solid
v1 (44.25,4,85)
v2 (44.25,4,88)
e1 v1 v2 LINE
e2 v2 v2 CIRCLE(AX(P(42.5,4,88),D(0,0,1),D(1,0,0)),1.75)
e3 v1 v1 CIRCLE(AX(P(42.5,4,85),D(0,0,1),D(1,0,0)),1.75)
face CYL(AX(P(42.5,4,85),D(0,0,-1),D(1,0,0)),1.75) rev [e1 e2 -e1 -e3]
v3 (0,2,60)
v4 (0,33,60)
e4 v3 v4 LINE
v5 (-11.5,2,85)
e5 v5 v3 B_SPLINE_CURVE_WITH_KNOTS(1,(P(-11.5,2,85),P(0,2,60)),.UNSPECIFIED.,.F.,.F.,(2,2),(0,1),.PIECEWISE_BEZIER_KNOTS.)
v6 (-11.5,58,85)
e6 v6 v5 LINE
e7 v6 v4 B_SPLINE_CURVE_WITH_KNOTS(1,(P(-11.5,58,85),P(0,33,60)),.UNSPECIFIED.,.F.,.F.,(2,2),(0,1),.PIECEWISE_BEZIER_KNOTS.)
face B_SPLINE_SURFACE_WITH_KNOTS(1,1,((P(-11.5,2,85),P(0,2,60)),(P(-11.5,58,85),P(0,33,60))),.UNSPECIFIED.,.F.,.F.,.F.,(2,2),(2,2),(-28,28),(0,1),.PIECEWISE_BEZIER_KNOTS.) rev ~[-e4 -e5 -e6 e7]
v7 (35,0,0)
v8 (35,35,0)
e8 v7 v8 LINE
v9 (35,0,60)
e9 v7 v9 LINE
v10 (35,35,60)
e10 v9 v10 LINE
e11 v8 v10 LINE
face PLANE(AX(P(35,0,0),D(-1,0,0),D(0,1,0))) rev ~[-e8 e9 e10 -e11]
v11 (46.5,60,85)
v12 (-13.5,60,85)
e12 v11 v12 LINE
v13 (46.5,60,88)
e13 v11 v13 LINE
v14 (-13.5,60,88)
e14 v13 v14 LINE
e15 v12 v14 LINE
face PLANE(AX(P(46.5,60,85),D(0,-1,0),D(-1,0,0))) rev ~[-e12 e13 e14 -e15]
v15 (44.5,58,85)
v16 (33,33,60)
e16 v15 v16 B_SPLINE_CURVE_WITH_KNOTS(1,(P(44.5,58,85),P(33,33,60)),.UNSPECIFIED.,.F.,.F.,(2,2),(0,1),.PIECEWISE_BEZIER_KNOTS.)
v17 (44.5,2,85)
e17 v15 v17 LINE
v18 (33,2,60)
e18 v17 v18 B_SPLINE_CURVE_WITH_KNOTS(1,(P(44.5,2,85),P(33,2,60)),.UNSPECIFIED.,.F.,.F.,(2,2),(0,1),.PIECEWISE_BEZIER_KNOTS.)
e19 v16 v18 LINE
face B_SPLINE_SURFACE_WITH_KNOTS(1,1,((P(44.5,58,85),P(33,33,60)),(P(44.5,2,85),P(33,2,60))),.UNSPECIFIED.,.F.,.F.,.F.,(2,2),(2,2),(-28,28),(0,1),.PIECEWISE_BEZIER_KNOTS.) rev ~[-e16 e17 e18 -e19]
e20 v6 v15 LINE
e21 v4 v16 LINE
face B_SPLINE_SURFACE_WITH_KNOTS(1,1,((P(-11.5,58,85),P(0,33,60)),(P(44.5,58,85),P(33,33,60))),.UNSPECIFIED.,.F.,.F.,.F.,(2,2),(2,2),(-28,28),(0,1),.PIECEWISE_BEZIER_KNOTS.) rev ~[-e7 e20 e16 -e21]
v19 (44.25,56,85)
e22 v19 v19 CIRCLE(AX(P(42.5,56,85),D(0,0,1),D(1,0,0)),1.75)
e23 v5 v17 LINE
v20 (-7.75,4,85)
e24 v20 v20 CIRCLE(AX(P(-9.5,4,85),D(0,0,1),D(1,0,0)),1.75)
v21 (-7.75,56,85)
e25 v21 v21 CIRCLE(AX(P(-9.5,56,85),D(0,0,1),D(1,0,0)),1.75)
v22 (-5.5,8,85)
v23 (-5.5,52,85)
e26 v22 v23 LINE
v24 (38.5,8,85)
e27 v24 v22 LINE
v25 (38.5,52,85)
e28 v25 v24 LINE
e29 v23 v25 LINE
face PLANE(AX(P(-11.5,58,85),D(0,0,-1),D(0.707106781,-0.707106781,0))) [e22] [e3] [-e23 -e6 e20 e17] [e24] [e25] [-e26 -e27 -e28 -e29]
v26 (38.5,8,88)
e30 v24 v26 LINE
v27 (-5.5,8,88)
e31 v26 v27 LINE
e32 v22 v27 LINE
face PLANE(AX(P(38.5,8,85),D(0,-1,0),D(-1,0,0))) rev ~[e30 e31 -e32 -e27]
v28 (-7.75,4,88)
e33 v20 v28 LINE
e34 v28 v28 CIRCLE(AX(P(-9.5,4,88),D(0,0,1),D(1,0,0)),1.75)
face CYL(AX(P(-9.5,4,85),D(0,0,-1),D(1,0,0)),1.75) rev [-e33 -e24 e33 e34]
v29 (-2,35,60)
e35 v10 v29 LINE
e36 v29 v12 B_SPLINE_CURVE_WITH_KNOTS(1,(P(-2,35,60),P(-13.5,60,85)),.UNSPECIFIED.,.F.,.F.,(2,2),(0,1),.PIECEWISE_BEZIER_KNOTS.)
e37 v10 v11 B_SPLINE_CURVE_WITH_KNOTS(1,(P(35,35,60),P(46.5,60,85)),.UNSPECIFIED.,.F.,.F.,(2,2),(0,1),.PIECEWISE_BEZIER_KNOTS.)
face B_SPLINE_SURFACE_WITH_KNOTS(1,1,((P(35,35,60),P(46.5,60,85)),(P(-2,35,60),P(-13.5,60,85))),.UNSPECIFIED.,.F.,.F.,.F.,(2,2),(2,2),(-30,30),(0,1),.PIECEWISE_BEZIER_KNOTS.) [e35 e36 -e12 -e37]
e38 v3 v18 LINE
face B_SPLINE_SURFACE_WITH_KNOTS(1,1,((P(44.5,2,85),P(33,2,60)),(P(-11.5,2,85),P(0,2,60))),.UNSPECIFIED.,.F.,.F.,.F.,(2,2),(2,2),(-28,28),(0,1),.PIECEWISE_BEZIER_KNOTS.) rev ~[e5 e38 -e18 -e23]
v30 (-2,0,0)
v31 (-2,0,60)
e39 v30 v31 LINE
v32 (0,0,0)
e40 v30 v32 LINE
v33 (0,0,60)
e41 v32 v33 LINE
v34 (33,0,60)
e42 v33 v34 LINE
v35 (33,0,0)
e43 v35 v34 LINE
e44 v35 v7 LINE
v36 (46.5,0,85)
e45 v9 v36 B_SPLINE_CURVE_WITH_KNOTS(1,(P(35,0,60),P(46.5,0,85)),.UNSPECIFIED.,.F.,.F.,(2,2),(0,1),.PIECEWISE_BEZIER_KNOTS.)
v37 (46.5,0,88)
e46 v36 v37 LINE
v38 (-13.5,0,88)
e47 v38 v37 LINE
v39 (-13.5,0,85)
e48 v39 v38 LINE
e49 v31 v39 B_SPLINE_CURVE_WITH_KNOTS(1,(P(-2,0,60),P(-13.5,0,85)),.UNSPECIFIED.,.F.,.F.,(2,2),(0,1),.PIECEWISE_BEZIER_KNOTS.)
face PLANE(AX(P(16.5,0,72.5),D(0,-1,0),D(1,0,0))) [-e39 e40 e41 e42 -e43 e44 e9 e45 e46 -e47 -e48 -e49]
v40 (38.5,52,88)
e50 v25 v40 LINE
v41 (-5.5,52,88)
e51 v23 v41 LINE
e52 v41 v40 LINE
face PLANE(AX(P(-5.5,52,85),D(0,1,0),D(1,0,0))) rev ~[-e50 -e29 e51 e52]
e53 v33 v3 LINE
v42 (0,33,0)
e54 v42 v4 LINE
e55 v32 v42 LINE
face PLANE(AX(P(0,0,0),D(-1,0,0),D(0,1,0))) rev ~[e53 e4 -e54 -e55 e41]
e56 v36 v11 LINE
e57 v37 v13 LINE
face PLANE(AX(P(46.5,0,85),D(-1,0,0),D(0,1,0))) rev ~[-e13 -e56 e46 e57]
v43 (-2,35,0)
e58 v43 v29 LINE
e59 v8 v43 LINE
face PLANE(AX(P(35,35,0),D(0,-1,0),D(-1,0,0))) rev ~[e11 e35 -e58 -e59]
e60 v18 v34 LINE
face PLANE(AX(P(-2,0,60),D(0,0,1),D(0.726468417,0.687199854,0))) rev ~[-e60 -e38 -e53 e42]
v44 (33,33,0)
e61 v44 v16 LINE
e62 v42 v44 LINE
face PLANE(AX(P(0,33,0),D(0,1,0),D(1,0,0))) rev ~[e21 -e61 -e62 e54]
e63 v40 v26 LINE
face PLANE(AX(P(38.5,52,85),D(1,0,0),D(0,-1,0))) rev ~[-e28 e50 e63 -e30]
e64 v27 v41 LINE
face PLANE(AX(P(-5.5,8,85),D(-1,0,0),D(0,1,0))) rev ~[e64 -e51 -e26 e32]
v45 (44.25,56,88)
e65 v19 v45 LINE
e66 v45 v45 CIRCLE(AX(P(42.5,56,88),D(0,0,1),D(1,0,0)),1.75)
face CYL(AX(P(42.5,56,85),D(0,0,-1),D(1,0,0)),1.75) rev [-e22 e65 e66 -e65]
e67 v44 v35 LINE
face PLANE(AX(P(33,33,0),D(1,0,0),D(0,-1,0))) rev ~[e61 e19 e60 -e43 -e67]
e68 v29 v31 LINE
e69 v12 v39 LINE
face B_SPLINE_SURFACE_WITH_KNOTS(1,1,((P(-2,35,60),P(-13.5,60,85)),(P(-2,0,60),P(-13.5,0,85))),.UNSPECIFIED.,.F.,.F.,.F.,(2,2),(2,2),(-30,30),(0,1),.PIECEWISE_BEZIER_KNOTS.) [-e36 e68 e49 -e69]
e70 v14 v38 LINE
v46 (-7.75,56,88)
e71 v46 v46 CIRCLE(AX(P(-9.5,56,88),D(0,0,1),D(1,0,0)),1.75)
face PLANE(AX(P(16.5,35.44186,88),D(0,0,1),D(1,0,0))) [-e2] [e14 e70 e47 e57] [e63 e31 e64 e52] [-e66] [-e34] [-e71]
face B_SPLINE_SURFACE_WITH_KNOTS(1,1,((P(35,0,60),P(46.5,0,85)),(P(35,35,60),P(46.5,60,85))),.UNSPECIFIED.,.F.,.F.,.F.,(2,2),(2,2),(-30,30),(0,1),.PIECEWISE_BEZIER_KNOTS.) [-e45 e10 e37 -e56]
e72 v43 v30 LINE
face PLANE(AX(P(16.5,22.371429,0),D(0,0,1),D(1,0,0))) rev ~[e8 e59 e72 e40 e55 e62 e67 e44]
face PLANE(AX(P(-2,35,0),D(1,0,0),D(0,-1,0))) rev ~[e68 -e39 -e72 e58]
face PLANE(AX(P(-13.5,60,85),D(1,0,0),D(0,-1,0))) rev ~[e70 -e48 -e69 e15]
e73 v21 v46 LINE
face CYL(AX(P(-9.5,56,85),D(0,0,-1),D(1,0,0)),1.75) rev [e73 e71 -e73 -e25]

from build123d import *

# Parameters (mm, degrees)
F1_DEPTH = 60
F3_R     = 1.75
F3_W     = 3.5
F3_H     = 8
F3_W_2   = 2
F3_W_3   = 33
F4_DEPTH = 3
F6_W     = 37
F6_H     = 35
F5_W     = 60
F5_H     = 60
F10_W    = 56
F10_H    = 56


# Not quite as in the source:
# - a feature names something its author has since deleted; it is built from what else it names


with BuildPart() as f1:
    # F0 (on Top) → F1 (new body)
    with BuildSketch(Plane.XY):
        Polygon((-2, 0), (0, 0), (0, 33), (33, 33), (33, 0), (35, 0), (35, 35), (-2, 35), align=None)
    extrude(amount=F1_DEPTH)



with BuildPart() as f4:
    # F3 (on offset) → F4 (new body)
    with BuildSketch(Plane.XY.offset(85)):
        Polygon((-13.5, 0), (-5.5, 0), (-5.5, 8), (-5.5, 52), (38.5, 52), (38.5, 8), (38.5, 0), (46.5, 0), (46.5, 60), (-13.5, 60), align=None)
        with Locations((-9.5, 4)):
            Circle(F3_R, mode=Mode.SUBTRACT)
        with Locations((42.5, 4)):
            Circle(F3_R, mode=Mode.SUBTRACT)
        with Locations((-9.5, 56)):
            Circle(F3_R, mode=Mode.SUBTRACT)
        with Locations((42.5, 56)):
            Circle(F3_R, mode=Mode.SUBTRACT)
        with Locations((-3.75, 4)):
            Rectangle(F3_W, F3_H)
        with Locations((36.75, 4)):
            Rectangle(F3_W, F3_H)
        with Locations((34, 4)):
            Rectangle(F3_W_2, F3_H)
        with Locations((-1, 4)):
            Rectangle(F3_W_2, F3_H)
        with Locations((16.5, 4)):
            Rectangle(F3_W_3, F3_H)
    extrude(amount=F4_DEPTH)


with BuildPart() as f1_1:
    add(f1.part)

    add(f4.part)  # F7 merges F4
    # F6 (on face) → F7 section 0
    with BuildSketch(Plane.XY.offset(60)):
        with Locations((16.5, 17.5)):
            Rectangle(F6_W, F6_H)
    # F5 (on face) → F7 section 1
    with BuildSketch(Plane.XY.offset(85)):
        with Locations((16.5, 30)):
            Rectangle(F5_W, F5_H)
    loft()


with BuildPart() as f11:
    # F10 (on offset) → F11 section 0
    with BuildSketch(Plane(origin=(0, 0, 85), x_dir=(1, 0, 0), z_dir=(0, 0, -1))):
        with Locations((16.5, -30)):
            Rectangle(F10_W, F10_H)
    # F9 (on face) → F11 section 1
    with BuildSketch(Plane.XY.offset(60)):
        Polygon((0, 33), (0, 2), (2, 2), (4, 2), (29, 2), (31, 2), (33, 2), (33, 33), align=None)
    loft()


with BuildPart() as f1_2:
    add(f1_1.part)

    # F13: cut F11
    add(f11.part, mode=Mode.SUBTRACT)


solid = f1_2.part
